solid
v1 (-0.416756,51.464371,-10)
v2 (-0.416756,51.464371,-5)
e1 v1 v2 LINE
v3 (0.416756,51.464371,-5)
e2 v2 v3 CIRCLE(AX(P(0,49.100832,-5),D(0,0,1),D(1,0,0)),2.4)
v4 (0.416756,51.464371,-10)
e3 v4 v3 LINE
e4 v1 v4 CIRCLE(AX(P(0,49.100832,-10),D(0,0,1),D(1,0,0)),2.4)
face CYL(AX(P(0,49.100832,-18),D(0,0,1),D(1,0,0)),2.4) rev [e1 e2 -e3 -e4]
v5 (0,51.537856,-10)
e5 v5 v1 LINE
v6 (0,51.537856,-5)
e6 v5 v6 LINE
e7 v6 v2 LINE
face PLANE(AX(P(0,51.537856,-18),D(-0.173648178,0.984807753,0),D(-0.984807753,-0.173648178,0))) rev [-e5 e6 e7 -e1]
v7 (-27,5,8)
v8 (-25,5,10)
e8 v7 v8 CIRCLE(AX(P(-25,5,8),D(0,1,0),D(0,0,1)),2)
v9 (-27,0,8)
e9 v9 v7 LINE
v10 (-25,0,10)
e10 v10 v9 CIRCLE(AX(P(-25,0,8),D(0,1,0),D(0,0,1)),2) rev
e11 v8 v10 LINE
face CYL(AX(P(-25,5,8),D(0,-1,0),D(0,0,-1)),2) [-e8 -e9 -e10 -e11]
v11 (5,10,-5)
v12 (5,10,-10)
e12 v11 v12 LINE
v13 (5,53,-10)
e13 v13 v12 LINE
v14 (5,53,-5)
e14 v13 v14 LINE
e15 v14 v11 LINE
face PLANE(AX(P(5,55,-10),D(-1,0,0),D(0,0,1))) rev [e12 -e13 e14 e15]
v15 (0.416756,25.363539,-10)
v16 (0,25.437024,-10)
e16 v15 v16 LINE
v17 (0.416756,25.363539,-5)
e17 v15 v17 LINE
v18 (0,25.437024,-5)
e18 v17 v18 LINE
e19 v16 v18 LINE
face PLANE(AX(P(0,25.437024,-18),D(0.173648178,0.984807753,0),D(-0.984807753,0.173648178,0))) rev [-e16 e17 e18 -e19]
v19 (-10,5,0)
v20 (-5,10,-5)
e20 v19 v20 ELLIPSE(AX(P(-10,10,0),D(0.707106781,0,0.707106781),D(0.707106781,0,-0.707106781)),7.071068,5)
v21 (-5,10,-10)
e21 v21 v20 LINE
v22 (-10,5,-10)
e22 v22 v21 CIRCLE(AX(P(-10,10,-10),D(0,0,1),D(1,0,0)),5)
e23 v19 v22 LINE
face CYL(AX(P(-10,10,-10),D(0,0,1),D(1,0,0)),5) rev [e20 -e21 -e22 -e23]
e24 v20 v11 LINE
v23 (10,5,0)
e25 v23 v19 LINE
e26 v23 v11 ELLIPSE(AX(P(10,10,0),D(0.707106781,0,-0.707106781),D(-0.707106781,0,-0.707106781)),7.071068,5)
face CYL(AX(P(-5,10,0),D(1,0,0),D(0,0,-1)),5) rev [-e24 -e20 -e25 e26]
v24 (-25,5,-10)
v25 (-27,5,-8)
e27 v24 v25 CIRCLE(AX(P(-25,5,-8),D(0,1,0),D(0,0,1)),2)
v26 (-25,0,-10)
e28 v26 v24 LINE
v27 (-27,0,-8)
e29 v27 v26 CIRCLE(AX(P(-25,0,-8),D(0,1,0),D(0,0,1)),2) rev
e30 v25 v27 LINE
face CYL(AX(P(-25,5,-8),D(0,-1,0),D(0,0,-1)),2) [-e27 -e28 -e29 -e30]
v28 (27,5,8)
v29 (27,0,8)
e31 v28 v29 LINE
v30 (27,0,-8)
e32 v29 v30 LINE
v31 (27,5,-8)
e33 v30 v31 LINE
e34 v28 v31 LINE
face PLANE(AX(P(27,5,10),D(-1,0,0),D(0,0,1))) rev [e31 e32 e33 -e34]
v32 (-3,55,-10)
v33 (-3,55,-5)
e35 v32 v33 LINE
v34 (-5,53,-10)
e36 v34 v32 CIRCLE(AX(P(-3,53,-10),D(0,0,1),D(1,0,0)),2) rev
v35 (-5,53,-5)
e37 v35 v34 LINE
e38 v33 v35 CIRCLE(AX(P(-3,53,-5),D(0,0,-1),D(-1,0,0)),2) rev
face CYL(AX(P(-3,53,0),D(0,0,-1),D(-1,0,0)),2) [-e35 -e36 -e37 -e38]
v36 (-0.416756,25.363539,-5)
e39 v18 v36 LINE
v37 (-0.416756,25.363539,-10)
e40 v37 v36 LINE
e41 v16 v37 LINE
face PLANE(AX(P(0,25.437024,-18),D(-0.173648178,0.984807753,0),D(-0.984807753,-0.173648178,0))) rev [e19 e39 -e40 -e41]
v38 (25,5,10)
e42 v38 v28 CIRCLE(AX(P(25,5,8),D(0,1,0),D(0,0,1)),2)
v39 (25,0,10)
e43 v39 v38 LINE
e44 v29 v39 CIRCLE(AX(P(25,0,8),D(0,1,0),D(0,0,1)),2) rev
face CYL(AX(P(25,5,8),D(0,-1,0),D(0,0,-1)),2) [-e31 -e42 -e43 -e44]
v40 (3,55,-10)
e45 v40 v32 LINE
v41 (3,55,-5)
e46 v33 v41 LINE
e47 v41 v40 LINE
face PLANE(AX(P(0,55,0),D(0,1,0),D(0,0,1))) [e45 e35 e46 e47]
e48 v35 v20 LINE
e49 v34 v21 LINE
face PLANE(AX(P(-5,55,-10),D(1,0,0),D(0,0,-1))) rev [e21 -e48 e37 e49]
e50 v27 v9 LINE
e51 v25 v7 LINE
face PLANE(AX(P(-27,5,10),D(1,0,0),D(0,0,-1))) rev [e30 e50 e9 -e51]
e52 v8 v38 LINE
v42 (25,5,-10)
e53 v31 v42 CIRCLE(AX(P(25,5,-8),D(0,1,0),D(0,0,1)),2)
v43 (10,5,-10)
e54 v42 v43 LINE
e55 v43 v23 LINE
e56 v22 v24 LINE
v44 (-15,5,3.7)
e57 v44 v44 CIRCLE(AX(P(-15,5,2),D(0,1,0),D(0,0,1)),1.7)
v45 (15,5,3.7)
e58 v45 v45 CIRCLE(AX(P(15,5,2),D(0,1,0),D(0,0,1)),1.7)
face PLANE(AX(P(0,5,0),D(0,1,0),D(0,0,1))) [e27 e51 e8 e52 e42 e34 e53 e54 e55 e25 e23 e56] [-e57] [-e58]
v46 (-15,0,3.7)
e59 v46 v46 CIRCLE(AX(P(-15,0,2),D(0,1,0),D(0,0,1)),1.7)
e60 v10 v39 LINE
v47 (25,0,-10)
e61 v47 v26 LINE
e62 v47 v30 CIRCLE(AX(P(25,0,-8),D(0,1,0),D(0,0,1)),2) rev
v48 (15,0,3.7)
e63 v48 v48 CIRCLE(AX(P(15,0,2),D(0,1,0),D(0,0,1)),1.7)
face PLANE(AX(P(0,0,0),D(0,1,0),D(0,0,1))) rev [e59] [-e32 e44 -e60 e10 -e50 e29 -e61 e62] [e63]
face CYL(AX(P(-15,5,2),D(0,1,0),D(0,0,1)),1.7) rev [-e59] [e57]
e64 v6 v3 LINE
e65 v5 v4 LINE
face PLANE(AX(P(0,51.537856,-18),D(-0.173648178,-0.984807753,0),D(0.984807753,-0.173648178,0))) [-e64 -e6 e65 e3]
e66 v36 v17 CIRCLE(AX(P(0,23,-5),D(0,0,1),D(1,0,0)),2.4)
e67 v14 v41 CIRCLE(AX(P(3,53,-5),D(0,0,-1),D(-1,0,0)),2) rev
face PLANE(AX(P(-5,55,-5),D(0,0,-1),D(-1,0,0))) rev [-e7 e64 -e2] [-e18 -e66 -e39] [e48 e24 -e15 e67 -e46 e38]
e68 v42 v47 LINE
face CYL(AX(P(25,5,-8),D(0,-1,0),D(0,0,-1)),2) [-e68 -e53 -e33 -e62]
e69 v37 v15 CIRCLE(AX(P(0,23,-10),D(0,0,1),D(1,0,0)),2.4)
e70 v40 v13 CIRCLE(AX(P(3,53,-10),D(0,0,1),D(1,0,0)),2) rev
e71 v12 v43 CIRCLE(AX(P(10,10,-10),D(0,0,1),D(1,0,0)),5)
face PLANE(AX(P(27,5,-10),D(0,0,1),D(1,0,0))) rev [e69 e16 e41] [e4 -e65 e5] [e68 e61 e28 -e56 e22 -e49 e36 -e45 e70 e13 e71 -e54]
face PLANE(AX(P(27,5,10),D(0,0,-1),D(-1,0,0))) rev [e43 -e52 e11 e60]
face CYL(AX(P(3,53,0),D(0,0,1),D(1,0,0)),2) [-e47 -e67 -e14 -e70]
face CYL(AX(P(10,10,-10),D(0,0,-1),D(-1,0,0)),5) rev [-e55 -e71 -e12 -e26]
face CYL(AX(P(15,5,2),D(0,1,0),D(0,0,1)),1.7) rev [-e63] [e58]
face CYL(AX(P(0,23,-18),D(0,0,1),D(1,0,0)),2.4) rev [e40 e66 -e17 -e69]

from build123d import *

# Parameters (mm, degrees)
SKETCH1_W               = 54
SKETCH1_H               = 20
BOSS_EXTRUDE1_DEPTH     = 5
BOSS_EXTRUDE2_OUTLINE_W = 10
BOSS_EXTRUDE2_OUTLINE_H = 5
BOSS_EXTRUDE2_DEPTH     = 50
M3_CLEARANCE_HOLE2_D    = 3.4
FILLET1_R               = 2
CUT_EXTRUDE6_DEPTH      = 13
CUT_EXTRUDE8_DEPTH      = 13
FILLET3_R               = 5


# Read off the part's stored shape, not the designer's step: Boss-Extrude2
with BuildPart() as part:
    # Sketch1 → Boss-Extrude1 (new body)
    with BuildSketch(Plane(origin=(0, 0, 0), x_dir=(1, 0, 0), z_dir=(0, 1, 0))):
        Rectangle(SKETCH1_W, SKETCH1_H)
    extrude(amount=BOSS_EXTRUDE1_DEPTH)

    # Boss-Extrude2 outline → Boss-Extrude2 (add)
    with BuildSketch(Plane(origin=(0, 5, 0), x_dir=(1, 0, 0), z_dir=(0, 1, 0))):
        with Locations((0, 7.5)):
            Rectangle(BOSS_EXTRUDE2_OUTLINE_W, BOSS_EXTRUDE2_OUTLINE_H)
    extrude(amount=BOSS_EXTRUDE2_DEPTH)

    # M3 Clearance Hole2 (through all)
    with Locations(Plane(origin=(0, 5, 0), x_dir=(1, 0, 0), z_dir=(0, 1, 0))):
        with Locations((15, -2), (-15, -2)):
            Hole(M3_CLEARANCE_HOLE2_D / 2)

    # Fillet1
    fillet1_edges = [part.edges().sort_by_distance(p)[0] for p in [
        (27, 2.5, 10),
        (-27, 2.5, 10),
        (5, 55, -7.5),
        (-5, 55, -7.5),
        (-27, 2.5, -10),
        (27, 2.5, -10),
    ]]
    fillet(fillet1_edges, radius=FILLET1_R)

    # Sketch16 → Cut-Extrude6 (cut)
    with BuildSketch(Plane.XY.offset(-5)):
        with BuildLine():
            Line((0, 51.537856262), (-0.416755626, 51.464371001))
            ThreePointArc((-0.416755626, 51.464371001), (0, 46.700832394), (0.416755626, 51.464371001))
            Line((0.416755626, 51.464371001), (0, 51.537856262))
        make_face()
    extrude(amount=-CUT_EXTRUDE6_DEPTH, mode=Mode.SUBTRACT)

    # Sketch17 → Cut-Extrude8 (cut)
    with BuildSketch(Plane.XY.offset(-5)):
        with BuildLine():
            Line((0, 25.437023869), (-0.416755626, 25.363538607))
            ThreePointArc((-0.416755626, 25.363538607), (0, 20.6), (0.416755626, 25.363538607))
            Line((0.416755626, 25.363538607), (0, 25.437023869))
        make_face()
    extrude(amount=-CUT_EXTRUDE8_DEPTH, mode=Mode.SUBTRACT)

    # Fillet3
    fillet3_edges = [part.edges().sort_by_distance(p)[0] for p in [
        (-5, 5, -7.5),
        (0, 5, -5),
        (5, 5, -7.5),
    ]]
    fillet(fillet3_edges, radius=FILLET3_R)


solid = part.part
